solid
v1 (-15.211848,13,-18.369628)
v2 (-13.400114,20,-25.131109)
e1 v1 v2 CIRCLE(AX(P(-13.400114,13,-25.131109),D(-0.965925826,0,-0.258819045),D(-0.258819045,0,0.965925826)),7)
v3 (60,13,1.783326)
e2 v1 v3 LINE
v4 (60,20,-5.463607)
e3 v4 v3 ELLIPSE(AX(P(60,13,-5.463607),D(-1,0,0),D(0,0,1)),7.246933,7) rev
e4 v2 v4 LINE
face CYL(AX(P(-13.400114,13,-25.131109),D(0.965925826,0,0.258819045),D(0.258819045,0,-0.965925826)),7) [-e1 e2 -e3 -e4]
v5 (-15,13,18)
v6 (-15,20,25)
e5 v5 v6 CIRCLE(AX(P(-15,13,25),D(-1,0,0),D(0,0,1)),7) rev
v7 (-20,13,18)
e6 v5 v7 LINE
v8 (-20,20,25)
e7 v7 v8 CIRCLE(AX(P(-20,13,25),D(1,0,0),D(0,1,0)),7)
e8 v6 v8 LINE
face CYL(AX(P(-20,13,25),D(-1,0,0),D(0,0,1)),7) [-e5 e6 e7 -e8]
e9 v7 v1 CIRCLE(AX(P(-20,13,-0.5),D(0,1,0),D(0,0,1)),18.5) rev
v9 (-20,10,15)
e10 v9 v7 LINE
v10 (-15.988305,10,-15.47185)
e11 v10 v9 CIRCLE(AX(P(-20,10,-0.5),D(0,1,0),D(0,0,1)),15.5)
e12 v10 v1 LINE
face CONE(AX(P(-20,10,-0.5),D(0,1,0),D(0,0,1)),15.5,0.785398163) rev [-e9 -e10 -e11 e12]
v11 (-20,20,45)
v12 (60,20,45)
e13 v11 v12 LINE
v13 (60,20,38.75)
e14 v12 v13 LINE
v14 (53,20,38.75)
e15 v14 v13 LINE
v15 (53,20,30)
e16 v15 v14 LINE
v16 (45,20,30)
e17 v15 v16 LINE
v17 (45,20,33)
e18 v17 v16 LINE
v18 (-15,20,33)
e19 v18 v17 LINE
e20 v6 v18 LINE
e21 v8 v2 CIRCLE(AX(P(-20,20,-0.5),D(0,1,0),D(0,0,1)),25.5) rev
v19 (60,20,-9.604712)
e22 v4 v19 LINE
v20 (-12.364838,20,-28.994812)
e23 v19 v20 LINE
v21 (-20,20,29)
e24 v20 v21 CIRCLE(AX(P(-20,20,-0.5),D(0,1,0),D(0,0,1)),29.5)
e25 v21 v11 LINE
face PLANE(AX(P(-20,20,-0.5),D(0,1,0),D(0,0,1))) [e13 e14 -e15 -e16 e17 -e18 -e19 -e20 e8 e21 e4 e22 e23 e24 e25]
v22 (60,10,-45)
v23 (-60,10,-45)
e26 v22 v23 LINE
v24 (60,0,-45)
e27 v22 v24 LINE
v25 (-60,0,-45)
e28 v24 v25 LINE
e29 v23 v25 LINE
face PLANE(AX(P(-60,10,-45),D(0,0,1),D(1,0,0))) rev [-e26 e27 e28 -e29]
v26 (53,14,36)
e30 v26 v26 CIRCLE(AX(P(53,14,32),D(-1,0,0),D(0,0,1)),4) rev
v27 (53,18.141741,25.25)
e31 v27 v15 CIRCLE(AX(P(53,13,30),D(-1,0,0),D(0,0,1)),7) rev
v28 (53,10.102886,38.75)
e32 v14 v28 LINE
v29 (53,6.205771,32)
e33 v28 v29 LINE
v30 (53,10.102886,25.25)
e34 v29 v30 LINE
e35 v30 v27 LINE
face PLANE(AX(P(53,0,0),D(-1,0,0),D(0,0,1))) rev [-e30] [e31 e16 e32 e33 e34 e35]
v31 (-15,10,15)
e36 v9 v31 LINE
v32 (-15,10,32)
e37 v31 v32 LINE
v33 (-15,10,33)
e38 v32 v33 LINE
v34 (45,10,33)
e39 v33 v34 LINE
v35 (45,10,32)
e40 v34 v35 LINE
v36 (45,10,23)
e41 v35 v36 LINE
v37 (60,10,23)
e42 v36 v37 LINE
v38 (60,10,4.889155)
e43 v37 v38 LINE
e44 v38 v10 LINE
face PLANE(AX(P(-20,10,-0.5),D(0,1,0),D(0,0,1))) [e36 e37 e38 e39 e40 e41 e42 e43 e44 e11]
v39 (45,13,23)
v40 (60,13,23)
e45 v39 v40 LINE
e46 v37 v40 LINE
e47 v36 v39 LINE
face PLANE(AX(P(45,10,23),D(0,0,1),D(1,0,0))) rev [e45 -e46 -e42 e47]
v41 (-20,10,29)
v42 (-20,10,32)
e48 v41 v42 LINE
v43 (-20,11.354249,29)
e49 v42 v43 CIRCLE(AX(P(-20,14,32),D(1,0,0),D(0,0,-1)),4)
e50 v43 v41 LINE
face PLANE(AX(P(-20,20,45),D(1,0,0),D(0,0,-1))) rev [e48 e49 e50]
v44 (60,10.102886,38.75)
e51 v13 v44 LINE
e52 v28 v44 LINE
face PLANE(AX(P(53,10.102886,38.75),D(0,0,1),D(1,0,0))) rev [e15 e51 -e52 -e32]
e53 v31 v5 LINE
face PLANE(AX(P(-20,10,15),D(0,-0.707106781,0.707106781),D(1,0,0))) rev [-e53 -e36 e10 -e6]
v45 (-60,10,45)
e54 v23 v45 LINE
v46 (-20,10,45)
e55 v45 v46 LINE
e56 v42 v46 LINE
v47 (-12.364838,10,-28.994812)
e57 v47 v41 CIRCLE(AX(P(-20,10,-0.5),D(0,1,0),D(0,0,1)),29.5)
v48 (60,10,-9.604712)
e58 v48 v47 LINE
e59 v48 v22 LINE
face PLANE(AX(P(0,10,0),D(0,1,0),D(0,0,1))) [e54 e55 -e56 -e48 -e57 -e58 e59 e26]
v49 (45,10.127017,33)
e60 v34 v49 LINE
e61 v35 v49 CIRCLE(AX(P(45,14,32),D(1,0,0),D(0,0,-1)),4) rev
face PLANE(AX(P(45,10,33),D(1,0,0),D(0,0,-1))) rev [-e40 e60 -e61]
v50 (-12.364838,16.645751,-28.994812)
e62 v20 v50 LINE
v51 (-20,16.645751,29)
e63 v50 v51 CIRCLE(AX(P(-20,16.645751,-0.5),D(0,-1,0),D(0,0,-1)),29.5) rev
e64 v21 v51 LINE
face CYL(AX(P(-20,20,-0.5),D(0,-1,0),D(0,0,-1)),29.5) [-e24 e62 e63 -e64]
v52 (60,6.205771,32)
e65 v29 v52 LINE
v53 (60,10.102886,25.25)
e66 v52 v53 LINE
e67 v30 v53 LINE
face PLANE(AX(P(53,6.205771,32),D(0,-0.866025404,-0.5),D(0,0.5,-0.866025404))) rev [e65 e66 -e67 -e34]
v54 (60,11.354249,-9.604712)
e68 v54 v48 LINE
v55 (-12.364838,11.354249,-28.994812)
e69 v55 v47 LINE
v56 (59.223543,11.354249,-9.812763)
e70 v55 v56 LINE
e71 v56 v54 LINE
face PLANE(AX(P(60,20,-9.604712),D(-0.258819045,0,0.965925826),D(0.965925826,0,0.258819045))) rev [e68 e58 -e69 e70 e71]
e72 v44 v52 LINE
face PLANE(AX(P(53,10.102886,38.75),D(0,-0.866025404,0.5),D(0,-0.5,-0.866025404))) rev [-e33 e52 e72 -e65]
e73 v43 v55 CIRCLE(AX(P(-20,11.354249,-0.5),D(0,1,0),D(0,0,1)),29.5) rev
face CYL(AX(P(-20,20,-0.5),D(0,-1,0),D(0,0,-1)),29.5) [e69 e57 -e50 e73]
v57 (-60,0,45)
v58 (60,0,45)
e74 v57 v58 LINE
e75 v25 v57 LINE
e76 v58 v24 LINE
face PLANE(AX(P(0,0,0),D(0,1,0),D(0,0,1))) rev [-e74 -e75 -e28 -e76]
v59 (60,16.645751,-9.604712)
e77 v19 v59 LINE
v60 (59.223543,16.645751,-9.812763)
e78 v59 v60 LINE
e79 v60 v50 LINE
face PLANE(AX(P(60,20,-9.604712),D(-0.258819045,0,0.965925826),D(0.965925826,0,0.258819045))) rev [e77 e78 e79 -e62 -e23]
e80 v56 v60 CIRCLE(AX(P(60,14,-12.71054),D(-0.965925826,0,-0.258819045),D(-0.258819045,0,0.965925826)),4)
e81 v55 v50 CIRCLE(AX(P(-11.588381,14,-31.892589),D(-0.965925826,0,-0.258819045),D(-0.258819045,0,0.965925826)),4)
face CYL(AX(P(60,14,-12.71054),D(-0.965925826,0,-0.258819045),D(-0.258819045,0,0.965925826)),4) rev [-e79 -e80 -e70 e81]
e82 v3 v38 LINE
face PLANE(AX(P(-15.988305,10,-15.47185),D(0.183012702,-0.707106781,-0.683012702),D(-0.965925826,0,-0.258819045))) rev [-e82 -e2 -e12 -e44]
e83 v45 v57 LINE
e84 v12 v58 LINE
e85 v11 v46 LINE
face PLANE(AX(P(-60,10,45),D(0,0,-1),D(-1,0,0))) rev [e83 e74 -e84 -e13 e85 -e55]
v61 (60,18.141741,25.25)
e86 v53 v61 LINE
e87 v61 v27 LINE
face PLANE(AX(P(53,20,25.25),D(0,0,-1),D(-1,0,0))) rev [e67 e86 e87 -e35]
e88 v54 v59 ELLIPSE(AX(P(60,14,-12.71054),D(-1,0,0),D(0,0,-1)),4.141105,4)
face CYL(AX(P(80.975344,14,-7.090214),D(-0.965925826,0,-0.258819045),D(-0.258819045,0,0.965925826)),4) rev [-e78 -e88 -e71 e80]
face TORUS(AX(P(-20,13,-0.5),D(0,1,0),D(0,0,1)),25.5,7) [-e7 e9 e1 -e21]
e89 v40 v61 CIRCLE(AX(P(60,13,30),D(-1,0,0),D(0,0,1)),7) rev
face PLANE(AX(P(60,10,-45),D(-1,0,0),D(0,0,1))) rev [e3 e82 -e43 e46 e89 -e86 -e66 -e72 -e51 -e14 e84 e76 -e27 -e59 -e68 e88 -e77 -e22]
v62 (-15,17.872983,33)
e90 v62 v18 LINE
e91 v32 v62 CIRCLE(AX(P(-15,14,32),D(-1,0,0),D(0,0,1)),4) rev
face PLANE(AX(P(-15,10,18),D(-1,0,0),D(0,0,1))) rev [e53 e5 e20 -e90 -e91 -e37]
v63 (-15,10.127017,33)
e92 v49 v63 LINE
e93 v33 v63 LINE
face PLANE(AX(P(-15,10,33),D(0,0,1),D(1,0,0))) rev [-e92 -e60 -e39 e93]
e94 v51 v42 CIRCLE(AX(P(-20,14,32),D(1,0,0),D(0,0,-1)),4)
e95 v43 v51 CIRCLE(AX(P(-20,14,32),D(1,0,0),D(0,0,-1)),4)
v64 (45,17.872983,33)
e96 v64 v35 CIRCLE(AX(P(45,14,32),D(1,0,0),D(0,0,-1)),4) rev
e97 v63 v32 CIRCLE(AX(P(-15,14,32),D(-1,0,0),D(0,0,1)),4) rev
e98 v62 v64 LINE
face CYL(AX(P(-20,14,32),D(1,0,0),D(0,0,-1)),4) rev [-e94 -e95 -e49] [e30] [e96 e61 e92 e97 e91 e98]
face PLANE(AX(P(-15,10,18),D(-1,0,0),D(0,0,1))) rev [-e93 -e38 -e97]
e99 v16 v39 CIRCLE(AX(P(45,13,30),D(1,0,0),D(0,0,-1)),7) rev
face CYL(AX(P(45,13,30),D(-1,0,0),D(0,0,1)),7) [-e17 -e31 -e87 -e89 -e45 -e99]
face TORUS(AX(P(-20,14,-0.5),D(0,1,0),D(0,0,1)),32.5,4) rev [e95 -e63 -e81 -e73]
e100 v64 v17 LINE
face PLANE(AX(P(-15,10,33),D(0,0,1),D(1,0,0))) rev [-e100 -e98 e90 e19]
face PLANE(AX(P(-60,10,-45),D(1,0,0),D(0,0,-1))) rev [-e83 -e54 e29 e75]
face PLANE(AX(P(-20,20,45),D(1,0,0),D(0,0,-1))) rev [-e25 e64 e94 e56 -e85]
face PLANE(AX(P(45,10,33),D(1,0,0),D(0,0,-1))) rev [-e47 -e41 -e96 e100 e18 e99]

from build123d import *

# Parameters (mm, degrees)
SKETCH1_W           = 120
SKETCH1_H           = 90
BOSS_EXTRUDE1_DEPTH = 10
BOSS_EXTRUDE2_DEPTH = 10
SKETCH3_R           = 4
CUT_EXTRUDE1_DEPTH  = 10
CHAMFER2_SIZE       = 3
FILLET1_R           = 7
CUT_EXTRUDE2_DEPTH  = 7


with BuildPart() as part:
    # Sketch1 → Boss-Extrude1 (new body)
    with BuildSketch(Plane(origin=(0, 0, 0), x_dir=(1, 0, 0), z_dir=(0, 1, 0))):
        Rectangle(SKETCH1_W, SKETCH1_H)
    extrude(amount=BOSS_EXTRUDE1_DEPTH)

    # Sketch2 → Boss-Extrude2 (add)
    with BuildSketch(Plane(origin=(0, 10, 0), x_dir=(1, 0, 0), z_dir=(0, 1, 0))):
        with BuildLine():
            Line((60, -45), (-20, -45))
            Line((-20, -45), (-20, -29))
            ThreePointArc((-20, -29), (-49.247623411, 4.35052267), (-12.364838169, 28.994811876))
            Line((-12.364838169, 28.994811876), (60, 9.604711928))
            Line((60, 9.604711928), (60, -29))
            Line((60, -29), (60, -45))
        make_face()
    extrude(amount=BOSS_EXTRUDE2_DEPTH)

    # Cut-Sweep1: sweep along a path in Sketch4
    with BuildLine(Plane(origin=(0, 14, 0), x_dir=(1, 0, 0), z_dir=(0, 1, 0))) as cut_sweep1_path:
        Line((60, -32), (-20, -32))
        ThreePointArc((-20, -32), (-52.221957995, 4.742101247), (-11.588381034, 31.892589354))
        Line((-11.588381034, 31.892589354), (60, 12.710540469))
        Line((60, 12.710540469), (80.97534387, 7.090214018))
    # Sketch3 → Cut-Sweep1 (sweep, cut)
    with BuildSketch(Plane(origin=(60, 0, 0), x_dir=(0, 0, -1), z_dir=(1, 0, 0))):
        with Locations((-32, 14)):
            Circle(SKETCH3_R)
    sweep(path=cut_sweep1_path.line, mode=Mode.SUBTRACT)

    # Sketch5 → Cut-Extrude1 (cut)
    with BuildSketch(Plane(origin=(0, 20, 0), x_dir=(1, 0, 0), z_dir=(0, 1, 0))):
        with BuildLine():
            Line((-15, -18), (-15, -33))
            Line((-15, -33), (45, -33))
            Line((45, -33), (45, -23))
            Line((45, -23), (60, -23))
            Line((60, -23), (60, -1.783326057))
            Line((60, -1.783326057), (-15.211847666, 18.369627786))
            ThreePointArc((-15.211847666, 18.369627786), (-38.341729935, 2.914734556), (-20, -18))
            Line((-20, -18), (-15, -18))
        make_face()
    extrude(amount=-CUT_EXTRUDE1_DEPTH, mode=Mode.SUBTRACT)

    # Chamfer2
    chamfer2_edges = [part.edges().sort_by_distance(p)[0] for p in [
        (22.394076167, 10, -8.293150865),
        (-17.5, 10, 18),
        (-38.341729935, 10, -2.914734556),
    ]]
    chamfer(chamfer2_edges, length=CHAMFER2_SIZE)

    # Fillet1
    fillet1_edges = [part.edges().sort_by_distance(p)[0] for p in [
        (-17.5, 20, 18),
        (-38.341729935, 20, -2.914734556),
        (22.394076167, 20, -8.293150865),
        (52.5, 20, 23),
    ]]
    fillet(fillet1_edges, radius=FILLET1_R - 0.0001)  # a hair under: the kernel refuses the full size

    # Sketch6 → Cut-Extrude2 (cut)
    with BuildSketch(Plane(origin=(60, 0, 0), x_dir=(0, 0, -1), z_dir=(1, 0, 0))):
        Polygon((-32, 6.205771366), (-25.25, 10.102885683), (-25.25, 20), (-38.75, 20), (-38.75, 10.102885683), align=None)
    extrude(amount=-CUT_EXTRUDE2_DEPTH, mode=Mode.SUBTRACT)


solid = part.part
